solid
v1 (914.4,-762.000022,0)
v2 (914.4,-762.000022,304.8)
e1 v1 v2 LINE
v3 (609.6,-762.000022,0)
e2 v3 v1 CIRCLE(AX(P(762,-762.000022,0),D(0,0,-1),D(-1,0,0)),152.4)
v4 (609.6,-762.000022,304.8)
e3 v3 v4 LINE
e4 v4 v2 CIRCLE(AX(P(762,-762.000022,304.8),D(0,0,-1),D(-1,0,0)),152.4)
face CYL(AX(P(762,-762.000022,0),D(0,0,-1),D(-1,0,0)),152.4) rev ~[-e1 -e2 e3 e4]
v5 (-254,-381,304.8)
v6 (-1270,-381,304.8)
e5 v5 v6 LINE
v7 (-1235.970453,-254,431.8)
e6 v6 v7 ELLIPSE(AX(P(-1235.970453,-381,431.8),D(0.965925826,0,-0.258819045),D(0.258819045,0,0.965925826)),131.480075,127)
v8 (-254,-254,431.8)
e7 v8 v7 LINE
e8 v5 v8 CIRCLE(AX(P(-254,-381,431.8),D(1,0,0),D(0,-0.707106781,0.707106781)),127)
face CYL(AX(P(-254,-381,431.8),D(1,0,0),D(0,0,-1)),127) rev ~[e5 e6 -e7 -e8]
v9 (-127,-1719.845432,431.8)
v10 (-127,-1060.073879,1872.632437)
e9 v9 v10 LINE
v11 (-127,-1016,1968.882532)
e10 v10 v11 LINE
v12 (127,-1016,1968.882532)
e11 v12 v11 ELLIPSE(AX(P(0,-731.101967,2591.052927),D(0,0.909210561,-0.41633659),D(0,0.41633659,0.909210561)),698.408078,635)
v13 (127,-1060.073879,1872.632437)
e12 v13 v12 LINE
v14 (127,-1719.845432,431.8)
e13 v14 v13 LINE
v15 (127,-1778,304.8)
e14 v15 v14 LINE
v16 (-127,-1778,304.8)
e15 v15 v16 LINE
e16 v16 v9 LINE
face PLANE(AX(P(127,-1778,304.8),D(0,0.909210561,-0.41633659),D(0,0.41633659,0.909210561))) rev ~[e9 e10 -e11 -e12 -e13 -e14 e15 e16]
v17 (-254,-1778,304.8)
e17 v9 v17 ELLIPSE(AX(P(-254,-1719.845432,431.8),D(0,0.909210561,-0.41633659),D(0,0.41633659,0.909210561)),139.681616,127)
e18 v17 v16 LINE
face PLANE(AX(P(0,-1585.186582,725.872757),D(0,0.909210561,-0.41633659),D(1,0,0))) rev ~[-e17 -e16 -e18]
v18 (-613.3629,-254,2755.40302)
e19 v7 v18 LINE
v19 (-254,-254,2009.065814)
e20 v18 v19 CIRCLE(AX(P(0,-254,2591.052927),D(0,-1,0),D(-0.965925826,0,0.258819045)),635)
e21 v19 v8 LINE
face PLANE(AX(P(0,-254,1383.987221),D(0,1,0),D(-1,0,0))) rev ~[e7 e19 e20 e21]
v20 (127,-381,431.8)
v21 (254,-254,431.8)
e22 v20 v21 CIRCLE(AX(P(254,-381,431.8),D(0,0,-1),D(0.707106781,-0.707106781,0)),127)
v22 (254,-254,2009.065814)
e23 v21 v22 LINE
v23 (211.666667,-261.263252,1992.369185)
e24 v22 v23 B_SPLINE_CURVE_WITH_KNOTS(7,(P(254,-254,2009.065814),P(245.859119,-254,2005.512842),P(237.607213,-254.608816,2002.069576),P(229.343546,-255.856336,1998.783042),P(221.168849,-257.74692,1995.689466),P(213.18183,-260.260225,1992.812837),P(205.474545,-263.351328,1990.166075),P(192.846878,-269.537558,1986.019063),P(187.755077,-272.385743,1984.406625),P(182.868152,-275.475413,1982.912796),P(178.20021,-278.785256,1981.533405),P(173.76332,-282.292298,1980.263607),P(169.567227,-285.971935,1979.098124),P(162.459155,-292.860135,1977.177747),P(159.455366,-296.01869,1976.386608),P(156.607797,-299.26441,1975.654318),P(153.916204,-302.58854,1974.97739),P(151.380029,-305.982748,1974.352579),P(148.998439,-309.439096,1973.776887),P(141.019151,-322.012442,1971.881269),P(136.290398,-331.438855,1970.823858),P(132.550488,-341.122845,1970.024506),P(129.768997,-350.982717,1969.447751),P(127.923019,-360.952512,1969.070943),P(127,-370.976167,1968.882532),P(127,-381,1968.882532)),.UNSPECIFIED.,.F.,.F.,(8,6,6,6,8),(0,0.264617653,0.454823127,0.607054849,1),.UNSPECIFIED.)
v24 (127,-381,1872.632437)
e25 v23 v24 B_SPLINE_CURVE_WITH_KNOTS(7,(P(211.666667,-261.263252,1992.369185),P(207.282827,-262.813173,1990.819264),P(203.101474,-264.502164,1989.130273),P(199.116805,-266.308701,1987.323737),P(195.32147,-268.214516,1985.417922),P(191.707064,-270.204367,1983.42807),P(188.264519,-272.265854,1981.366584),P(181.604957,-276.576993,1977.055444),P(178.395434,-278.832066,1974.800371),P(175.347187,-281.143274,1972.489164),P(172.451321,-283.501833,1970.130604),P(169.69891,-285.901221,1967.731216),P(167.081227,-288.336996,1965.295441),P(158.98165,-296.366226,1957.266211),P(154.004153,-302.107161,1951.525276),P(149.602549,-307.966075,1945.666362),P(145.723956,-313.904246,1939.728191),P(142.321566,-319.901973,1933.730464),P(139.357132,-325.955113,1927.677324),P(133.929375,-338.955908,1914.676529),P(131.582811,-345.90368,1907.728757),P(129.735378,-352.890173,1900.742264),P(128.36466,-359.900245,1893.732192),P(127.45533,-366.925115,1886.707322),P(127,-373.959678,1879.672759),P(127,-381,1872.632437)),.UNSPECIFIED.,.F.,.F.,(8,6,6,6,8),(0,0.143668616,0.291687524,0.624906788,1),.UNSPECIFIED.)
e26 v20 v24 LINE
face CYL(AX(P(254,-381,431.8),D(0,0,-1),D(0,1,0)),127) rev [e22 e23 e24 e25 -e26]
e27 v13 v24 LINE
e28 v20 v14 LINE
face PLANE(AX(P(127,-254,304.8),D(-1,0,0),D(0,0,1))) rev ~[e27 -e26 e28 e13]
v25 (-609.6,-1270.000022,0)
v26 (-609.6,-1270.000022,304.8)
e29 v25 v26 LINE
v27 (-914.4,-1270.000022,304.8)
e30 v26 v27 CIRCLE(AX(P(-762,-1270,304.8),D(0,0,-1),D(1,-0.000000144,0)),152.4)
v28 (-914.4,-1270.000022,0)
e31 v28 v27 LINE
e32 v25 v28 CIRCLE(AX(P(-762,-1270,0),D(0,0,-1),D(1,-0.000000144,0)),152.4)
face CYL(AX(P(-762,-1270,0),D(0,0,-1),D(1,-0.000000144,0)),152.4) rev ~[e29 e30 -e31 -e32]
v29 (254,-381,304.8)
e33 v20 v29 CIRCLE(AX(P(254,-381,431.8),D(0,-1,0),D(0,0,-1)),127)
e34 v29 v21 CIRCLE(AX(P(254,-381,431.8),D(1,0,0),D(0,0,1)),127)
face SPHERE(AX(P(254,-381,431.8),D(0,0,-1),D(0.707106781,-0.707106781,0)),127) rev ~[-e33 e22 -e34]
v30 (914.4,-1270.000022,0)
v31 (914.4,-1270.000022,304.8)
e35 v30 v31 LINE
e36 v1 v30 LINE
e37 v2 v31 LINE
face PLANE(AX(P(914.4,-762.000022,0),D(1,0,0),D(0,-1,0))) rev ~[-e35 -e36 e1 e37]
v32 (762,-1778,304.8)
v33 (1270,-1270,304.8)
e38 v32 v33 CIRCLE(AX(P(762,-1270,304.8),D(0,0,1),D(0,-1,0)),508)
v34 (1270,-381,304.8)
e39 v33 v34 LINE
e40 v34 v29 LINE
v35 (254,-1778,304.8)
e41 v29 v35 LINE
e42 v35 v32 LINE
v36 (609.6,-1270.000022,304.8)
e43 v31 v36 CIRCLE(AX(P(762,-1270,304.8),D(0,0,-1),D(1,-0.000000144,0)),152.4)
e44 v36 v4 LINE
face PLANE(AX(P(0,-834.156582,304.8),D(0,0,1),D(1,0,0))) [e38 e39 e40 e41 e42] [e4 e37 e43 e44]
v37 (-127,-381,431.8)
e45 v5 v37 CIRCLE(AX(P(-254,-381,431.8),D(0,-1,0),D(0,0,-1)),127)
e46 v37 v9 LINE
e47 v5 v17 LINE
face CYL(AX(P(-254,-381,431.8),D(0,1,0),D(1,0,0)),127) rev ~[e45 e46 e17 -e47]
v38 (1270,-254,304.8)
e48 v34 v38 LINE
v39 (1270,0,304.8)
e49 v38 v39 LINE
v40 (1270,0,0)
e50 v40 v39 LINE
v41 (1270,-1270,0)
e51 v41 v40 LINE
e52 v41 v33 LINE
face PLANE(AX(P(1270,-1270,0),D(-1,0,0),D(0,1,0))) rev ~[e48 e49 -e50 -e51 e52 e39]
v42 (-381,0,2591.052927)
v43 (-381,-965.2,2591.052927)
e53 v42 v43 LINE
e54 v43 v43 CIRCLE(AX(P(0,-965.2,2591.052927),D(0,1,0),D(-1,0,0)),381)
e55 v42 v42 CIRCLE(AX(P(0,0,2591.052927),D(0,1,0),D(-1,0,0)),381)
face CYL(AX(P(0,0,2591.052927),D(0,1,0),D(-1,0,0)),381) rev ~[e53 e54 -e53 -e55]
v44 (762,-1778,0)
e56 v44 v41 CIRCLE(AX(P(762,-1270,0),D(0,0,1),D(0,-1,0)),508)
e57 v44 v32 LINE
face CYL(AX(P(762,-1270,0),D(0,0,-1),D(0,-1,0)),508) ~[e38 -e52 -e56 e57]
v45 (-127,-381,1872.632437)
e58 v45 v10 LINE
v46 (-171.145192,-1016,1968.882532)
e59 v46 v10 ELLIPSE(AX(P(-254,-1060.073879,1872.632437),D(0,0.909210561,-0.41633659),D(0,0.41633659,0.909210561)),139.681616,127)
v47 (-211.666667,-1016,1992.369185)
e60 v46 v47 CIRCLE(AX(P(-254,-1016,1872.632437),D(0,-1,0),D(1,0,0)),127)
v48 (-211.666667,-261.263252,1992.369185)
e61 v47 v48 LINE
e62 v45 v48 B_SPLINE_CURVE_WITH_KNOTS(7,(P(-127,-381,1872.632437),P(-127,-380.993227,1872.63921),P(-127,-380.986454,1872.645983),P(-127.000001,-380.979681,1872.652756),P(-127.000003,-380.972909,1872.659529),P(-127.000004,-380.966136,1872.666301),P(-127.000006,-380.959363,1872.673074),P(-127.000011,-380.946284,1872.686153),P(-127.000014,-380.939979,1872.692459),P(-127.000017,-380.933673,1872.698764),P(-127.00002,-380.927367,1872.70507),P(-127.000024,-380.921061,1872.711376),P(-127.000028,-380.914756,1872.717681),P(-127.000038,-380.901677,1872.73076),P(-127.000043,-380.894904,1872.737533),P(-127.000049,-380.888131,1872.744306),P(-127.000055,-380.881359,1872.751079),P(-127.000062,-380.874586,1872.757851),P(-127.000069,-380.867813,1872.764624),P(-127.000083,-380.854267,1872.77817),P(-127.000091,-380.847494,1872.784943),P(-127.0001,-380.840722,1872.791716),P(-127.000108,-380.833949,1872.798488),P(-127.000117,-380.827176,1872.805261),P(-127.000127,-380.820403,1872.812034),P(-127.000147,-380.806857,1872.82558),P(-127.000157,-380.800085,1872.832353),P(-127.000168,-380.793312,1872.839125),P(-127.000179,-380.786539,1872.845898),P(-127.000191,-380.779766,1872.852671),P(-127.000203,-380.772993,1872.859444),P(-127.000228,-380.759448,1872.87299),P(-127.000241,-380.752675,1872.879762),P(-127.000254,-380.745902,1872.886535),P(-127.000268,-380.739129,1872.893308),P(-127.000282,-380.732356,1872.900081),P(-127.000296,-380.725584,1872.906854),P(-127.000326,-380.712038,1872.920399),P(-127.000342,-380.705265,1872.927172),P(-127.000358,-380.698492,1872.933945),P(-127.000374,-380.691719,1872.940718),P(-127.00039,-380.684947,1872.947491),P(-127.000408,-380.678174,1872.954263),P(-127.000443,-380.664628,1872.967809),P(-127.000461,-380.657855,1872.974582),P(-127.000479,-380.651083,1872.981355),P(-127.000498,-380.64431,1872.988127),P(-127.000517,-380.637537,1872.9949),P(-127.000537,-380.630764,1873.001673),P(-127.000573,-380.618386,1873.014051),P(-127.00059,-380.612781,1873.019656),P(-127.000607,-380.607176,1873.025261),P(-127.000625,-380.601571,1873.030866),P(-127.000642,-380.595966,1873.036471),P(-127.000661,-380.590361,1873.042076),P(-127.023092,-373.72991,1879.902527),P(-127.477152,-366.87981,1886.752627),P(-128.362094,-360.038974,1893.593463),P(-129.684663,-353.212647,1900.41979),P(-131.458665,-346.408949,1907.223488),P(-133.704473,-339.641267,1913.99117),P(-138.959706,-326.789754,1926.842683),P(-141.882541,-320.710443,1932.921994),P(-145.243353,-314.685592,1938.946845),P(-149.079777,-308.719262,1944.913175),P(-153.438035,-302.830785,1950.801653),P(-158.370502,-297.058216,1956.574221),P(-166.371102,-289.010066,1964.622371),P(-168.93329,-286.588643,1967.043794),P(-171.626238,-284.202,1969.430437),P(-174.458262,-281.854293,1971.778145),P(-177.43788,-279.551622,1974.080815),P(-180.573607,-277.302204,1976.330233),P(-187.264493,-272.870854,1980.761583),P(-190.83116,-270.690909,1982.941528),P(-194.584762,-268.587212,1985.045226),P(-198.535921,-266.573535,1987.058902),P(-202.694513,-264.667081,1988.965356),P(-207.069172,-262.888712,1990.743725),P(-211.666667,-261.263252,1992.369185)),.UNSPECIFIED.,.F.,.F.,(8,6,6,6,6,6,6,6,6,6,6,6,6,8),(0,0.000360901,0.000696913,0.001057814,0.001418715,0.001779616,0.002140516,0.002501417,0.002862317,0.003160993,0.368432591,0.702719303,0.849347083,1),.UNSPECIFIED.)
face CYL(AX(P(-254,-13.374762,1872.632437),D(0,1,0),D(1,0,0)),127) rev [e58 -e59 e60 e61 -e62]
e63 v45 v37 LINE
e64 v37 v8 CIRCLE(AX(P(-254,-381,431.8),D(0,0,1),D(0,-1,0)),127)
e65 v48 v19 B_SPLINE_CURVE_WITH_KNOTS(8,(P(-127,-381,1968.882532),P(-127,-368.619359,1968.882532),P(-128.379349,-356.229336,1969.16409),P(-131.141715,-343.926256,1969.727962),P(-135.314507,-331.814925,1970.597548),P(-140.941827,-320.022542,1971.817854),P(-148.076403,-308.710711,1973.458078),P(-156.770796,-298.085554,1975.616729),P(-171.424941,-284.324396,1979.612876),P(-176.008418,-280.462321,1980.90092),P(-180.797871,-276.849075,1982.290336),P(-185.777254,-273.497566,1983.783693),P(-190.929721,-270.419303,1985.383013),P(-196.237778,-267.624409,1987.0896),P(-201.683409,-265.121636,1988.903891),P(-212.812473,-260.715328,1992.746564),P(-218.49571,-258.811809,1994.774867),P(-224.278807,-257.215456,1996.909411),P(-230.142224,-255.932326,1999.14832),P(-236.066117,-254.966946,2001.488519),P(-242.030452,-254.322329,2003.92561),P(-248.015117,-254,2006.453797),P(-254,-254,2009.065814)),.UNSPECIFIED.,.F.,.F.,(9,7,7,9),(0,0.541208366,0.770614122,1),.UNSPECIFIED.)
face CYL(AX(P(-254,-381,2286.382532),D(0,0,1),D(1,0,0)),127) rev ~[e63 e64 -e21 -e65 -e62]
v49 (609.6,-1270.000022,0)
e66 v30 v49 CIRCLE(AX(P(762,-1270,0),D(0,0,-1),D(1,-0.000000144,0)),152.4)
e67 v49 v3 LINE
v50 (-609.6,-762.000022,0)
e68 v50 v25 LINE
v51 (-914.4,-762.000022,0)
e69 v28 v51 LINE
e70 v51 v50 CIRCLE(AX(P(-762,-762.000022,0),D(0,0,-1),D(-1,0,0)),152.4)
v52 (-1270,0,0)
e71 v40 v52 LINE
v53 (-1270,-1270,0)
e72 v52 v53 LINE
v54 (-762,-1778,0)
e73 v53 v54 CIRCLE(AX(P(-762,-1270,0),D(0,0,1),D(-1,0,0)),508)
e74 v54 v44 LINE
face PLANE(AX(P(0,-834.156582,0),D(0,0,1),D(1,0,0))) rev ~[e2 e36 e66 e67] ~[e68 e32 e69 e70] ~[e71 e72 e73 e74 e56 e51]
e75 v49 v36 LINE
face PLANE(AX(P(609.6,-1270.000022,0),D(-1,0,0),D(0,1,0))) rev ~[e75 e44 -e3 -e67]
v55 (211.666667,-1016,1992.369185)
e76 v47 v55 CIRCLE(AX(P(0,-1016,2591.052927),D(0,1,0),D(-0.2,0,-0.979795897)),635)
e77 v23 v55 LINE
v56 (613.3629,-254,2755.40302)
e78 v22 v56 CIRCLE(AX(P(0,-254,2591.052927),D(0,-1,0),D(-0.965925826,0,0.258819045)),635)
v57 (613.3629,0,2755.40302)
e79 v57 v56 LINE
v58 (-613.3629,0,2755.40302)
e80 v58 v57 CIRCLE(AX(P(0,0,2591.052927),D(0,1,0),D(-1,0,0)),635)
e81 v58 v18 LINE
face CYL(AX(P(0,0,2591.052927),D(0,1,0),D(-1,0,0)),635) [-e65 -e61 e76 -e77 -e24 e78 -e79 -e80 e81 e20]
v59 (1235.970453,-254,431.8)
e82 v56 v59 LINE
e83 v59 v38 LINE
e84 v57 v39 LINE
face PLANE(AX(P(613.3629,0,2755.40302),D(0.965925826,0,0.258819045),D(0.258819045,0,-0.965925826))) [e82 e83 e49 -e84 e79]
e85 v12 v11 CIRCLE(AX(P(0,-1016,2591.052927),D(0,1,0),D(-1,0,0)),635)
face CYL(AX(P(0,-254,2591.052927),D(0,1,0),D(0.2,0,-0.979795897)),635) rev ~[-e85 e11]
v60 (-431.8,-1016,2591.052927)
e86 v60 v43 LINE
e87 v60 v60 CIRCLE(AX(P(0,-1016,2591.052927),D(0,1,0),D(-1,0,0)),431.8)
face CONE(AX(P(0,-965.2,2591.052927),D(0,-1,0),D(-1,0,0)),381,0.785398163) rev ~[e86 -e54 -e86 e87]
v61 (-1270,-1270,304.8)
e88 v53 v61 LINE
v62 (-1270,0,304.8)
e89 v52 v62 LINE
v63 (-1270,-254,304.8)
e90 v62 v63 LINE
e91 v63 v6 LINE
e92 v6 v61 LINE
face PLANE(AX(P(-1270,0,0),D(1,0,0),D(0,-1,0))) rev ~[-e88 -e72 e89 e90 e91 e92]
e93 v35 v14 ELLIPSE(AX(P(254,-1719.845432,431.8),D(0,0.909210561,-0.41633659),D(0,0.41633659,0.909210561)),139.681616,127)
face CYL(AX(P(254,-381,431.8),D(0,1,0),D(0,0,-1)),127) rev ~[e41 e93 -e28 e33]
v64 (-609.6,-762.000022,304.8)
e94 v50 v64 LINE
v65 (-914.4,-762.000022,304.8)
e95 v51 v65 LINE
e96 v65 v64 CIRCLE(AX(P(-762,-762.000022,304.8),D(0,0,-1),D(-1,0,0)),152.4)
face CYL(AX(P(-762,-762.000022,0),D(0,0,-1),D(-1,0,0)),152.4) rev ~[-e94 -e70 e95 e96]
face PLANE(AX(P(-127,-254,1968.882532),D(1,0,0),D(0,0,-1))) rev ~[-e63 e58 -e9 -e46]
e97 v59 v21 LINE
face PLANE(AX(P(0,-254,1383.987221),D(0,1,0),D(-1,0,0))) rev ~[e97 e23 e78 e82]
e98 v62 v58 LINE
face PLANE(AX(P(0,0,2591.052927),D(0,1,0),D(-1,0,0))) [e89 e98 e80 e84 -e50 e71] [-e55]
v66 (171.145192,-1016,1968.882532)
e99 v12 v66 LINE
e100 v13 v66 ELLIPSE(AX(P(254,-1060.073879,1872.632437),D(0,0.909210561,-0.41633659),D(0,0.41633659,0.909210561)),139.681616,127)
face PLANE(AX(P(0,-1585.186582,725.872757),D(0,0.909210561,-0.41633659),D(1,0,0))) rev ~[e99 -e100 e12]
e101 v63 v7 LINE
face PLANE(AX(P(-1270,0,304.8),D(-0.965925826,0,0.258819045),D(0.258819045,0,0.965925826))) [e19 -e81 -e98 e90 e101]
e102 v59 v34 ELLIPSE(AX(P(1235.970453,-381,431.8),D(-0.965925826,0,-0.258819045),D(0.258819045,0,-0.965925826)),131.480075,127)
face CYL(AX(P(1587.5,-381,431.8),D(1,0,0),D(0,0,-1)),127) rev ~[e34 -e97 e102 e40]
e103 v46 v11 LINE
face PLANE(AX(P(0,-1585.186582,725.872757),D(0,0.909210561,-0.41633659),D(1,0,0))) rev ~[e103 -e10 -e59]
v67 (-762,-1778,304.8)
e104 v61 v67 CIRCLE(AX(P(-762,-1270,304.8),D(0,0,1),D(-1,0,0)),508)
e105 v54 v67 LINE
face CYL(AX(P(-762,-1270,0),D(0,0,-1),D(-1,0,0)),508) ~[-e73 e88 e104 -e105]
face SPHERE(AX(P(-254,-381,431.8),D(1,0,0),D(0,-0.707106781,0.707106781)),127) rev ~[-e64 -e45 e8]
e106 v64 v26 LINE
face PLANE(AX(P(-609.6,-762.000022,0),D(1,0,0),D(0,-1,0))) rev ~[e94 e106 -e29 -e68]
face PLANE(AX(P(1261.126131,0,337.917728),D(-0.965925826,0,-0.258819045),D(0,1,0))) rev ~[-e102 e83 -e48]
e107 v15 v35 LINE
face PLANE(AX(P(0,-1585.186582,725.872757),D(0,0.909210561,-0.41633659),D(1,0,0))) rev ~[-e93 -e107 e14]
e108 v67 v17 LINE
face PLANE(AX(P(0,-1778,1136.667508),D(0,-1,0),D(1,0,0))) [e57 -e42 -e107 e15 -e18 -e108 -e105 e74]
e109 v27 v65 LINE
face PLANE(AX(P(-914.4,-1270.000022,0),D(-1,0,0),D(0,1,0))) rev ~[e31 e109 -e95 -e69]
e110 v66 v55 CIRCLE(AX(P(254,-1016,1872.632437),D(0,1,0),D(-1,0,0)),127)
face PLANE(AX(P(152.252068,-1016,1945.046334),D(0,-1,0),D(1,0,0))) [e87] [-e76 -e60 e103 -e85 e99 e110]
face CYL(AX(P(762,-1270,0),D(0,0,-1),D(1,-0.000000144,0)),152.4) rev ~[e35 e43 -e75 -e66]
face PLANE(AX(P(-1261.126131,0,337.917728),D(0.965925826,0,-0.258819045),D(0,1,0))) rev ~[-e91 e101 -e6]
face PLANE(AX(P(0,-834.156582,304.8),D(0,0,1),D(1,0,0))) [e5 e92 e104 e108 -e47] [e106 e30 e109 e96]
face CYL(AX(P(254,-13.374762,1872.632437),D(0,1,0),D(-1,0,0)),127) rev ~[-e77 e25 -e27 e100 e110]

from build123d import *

# Parameters (mm, degrees)
F1_DEPTH      = 304.8
F3_DEPTH      = 254
F2_R          = 381
F4_DEPTH      = 1016
F5_SIZE       = 50.8
F7_DEPTH      = 1524
F9_DEPTH      = 279.4
F10_T1_DEPTH  = 1002.6252375466
F10_S5_W      = 129.54
F10_S5_H      = 129.54
F10_T6_DEPTH  = 129.54
F10_S11_W     = 129.54
F10_S11_H     = 129.54
F10_T12_DEPTH = 129.54
F10_T18_DEPTH = 1333.5
F10_T23_DEPTH = 1714.5
F10_T28_DEPTH = 1854.5825321713
F10_S29_R     = 635
F10_T30_DEPTH = 933
F10_T34_DEPTH = 1854.5825321713
F10_S35_R     = 635
F10_T36_DEPTH = 933
F10_T40_DEPTH = 1333.5
F10_T45_DEPTH = 1714.5
F10_T50_DEPTH = 1243.2504750931
F10_T55_DEPTH = 1243.2504750931


# Not quite as in the source:
# - a fillet or chamfer that OpenCascade refuses, or shapes differently, is made with other operations: its cross-section is extruded or revolved along the edge and cut away or added


with BuildPart() as f1:
    # F0 (on Top) → F1 (new body)
    with BuildSketch(Plane.XY):
        with BuildLine():
            Line((0, 0), (-1270, 0))
            Line((-1270, 0), (-1270, -1270))
            ThreePointArc((-1270, -1270), (-1121.2102448428, -1629.2102448428), (-762, -1778))
            Line((-762, -1778), (762, -1778))
            ThreePointArc((762, -1778), (1121.2102448428, -1629.2102448428), (1270, -1270))
            Line((1270, -1270), (1270, 0))
            Line((1270, 0), (0, 0))
        make_face()
        with BuildLine():
            ThreePointArc((-609.6, -1270.0000219048), (-762, -1422.4), (-914.4, -1270.0000219048))
            Line((-914.4, -1270.0000219048), (-914.4, -762.0000219048))
            ThreePointArc((-914.4, -762.0000219048), (-762, -609.6000219048), (-609.6, -762.0000219048))
            Line((-609.6, -762.0000219048), (-609.6, -1270.0000219048))
        make_face(mode=Mode.SUBTRACT)
        with BuildLine():
            ThreePointArc((609.6, -762.0000219048), (762, -609.6000219048), (914.4, -762.0000219048))
            Line((914.4, -762.0000219048), (914.4, -1270.0000219048))
            ThreePointArc((914.4, -1270.0000219048), (762, -1422.4), (609.6, -1270.0000219048))
            Line((609.6, -1270.0000219048), (609.6, -762.0000219048))
        make_face(mode=Mode.SUBTRACT)
    extrude(amount=F1_DEPTH)

    # F2 (on face) → F3 (join)
    with BuildSketch(Plane(origin=(0, 0, 0), x_dir=(-1, 0, 0), z_dir=(0, 1, 0))):
        with BuildLine():
            Line((-613.3628996936, 2755.4030204783), (-1270, 304.8))
            Line((-1270, 304.8), (1270, 304.8))
            Line((1270, 304.8), (613.3628996936, 2755.4030204783))
            ThreePointArc((613.3628996936, 2755.4030204783), (629.5674869724, 2673.937058898), (635, 2591.0529268382))
            ThreePointArc((635, 2591.0529268382), (-82.8841320597, 1961.4854398659), (-613.3628996936, 2755.4030204783))
        make_face()
    extrude(amount=-F3_DEPTH)

    # F2 (on face) → F4 (join)
    with BuildSketch(Plane(origin=(0, 0, 0), x_dir=(-1, 0, 0), z_dir=(0, 1, 0))):
        with BuildLine():
            ThreePointArc((613.3628996936, 2755.4030204783), (0, 3226.0529268382), (-613.3628996936, 2755.4030204783))
            ThreePointArc((-613.3628996936, 2755.4030204783), (-82.8841320597, 1961.4854398659), (635, 2591.0529268382))
            ThreePointArc((635, 2591.0529268382), (629.5674869724, 2673.937058898), (613.3628996936, 2755.4030204783))
        make_face()
        with Locations((0, 2591.0529268382)):
            Circle(F2_R, mode=Mode.SUBTRACT)
    extrude(amount=-F4_DEPTH)

    # F5
    f5_edges = [f1.edges().sort_by_distance(p)[0] for p in [
        (381, -1016, 2591.052927),
    ]]
    chamfer(f5_edges, length=F5_SIZE)

    # F6 (on face) → F7 (join)
    with BuildSketch(Plane.XZ.offset(254)):
        with BuildLine():
            Line((-127, 1968.8825321713), (-127, 304.8))
            Line((-127, 304.8), (127, 304.8))
            Line((127, 304.8), (127, 1968.8825321713))
            ThreePointArc((127, 1968.8825321713), (0, 1956.0529268382), (-127, 1968.8825321713))
        make_face()
    extrude(amount=F7_DEPTH)

    # F8 (on face) → F9 (cut)
    with BuildSketch(Plane.YZ.offset(127)):
        Polygon((-1778, 1968.8825321713), (-1778, 304.8), (-1016, 1968.8825321713), align=None)
    extrude(amount=-F9_DEPTH, mode=Mode.SUBTRACT)

    # F10: fillet of radius 127 on 8 edges, made by hand

    # F10_s2 → F10_t1 (join)
    with BuildSketch(Plane.XZ.offset(13.3747624534)):
        with BuildLine():
            ThreePointArc((127, 1872.6324371527), (150.3049342222, 1945.9559213398), (211.6666666667, 1992.3691854336))
            ThreePointArc((211.6666666667, 1992.3691854336), (169.7400468309, 1979.1597037169), (127, 1968.8825321713))
            Line((127, 1968.8825321713), (127, 1872.6324371527))
        make_face()
        with BuildLine():
            ThreePointArc((-127, 1872.6324371527), (-150.3049342222, 1945.9559213398), (-211.6666666667, 1992.3691854336))
            ThreePointArc((-211.6666666667, 1992.3691854336), (-169.7400468309, 1979.1597037169), (-127, 1968.8825321713))
            Line((-127, 1968.8825321713), (-127, 1872.6324371527))
        make_face()
    extrude(amount=F10_T1_DEPTH)


with BuildPart() as f10_tool4:
    # F10_s5 → F10_t6 (new body)
    with BuildSketch(Plane.YZ.offset(-254)):
        with Locations((-316.23, 367.03)):
            Rectangle(F10_S5_W, F10_S5_H)
    extrude(amount=F10_T6_DEPTH)

    # F10_s7 → F10_t8 (revolve, cut)
    with BuildSketch(Plane(origin=(-254, -381, 431.8), x_dir=(0, -0.7071067812, 0.7071067812), z_dir=(0, 0.7071067812, 0.7071067812))):
        with BuildLine():
            ThreePointArc((0, -127), (127, 0), (0, 127))
            Line((0, 127), (0, -127))
        make_face()
    revolve(axis=Axis((-254, -381, 431.8), (1, 0, 0)), mode=Mode.SUBTRACT)


with BuildPart() as f1_1:
    add(f1.part)

    # F10_t3: union F10_tool4
    add(f10_tool4.part)


with BuildPart() as f10_tool10:
    # F10_s11 → F10_t12 (new body)
    with BuildSketch(Plane.XY.offset(431.8)):
        with Locations((189.23, -316.23)):
            Rectangle(F10_S11_W, F10_S11_H)
    extrude(amount=-F10_T12_DEPTH)

    # F10_s13 → F10_t14 (revolve, cut)
    with BuildSketch(Plane(origin=(254, -381, 431.8), x_dir=(0.7071067812, -0.7071067812, 0), z_dir=(0.7071067812, 0.7071067812, 0))):
        with BuildLine():
            ThreePointArc((0, -127), (127, 0), (0, 127))
            Line((0, 127), (0, -127))
        make_face()
    revolve(axis=Axis((254, -381, 431.8), (0, 0, -1)), mode=Mode.SUBTRACT)


with BuildPart() as f1_2:
    add(f1_1.part)

    # F10_t9: union F10_tool10
    add(f10_tool10.part)


with BuildPart() as f10_tool16:
    # F10_s17 → F10_t18 (new body)
    with BuildSketch(Plane.YZ.offset(-254)):
        with BuildLine():
            ThreePointArc((-381, 304.8), (-291.1974387893, 341.9974387893), (-254, 431.8))
            Line((-254, 431.8), (-254, 304.8))
            Line((-254, 304.8), (-381, 304.8))
        make_face()
    extrude(amount=-F10_T18_DEPTH)

    split(bisect_by=Plane(origin=(-1261.1261314031, 0, 337.9177284633), x_dir=(0, 1, 0), z_dir=(0.9659258263, 0, -0.2588190451)), keep=Keep.TOP)


with BuildPart() as f1_3:
    add(f1_2.part)

    # F10_t15: union F10_tool16
    add(f10_tool16.part)


with BuildPart() as f10_tool21:
    # F10_s22 → F10_t23 (new body)
    with BuildSketch(Plane.XZ.offset(381)):
        with BuildLine():
            ThreePointArc((-127, 431.8), (-164.1974387893, 341.9974387893), (-254, 304.8))
            Line((-254, 304.8), (-127, 304.8))
            Line((-127, 304.8), (-127, 431.8))
        make_face()
    extrude(amount=F10_T23_DEPTH)

    split(bisect_by=Plane(origin=(0, -1585.1865820182, 725.8727569971), x_dir=(1, 0, 0), z_dir=(0, 0.9092105607, -0.4163365902)), keep=Keep.TOP)


with BuildPart() as f1_4:
    add(f1_3.part)

    # F10_t20: union F10_tool21
    add(f10_tool21.part)


with BuildPart() as f10_tool26:
    # F10_s27 → F10_t28 (new body)
    with BuildSketch(Plane.XY.offset(2286.3825321713)):
        with BuildLine():
            ThreePointArc((-127, -381), (-164.1974387893, -291.1974387893), (-254, -254))
            Line((-254, -254), (-127, -254))
            Line((-127, -254), (-127, -381))
        make_face()
    extrude(amount=-F10_T28_DEPTH)

    # F10_s29 → F10_t30 (cut, symmetric)
    with BuildSketch(Plane.XZ.offset(317.5)):
        with Locations((0, 2591.0529268382)):
            Circle(F10_S29_R)
    extrude(amount=F10_T30_DEPTH, both=True, mode=Mode.SUBTRACT)


with BuildPart() as f1_5:
    add(f1_4.part)

    # F10_t25: union F10_tool26
    add(f10_tool26.part)


with BuildPart() as f10_tool32:
    # F10_s33 → F10_t34 (new body)
    with BuildSketch(Plane.XY.offset(431.8)):
        with BuildLine():
            ThreePointArc((254, -254), (164.1974387893, -291.1974387893), (127, -381))
            Line((127, -381), (127, -254))
            Line((127, -254), (254, -254))
        make_face()
    extrude(amount=F10_T34_DEPTH)

    # F10_s35 → F10_t36 (cut, symmetric)
    with BuildSketch(Plane.XZ.offset(317.5)):
        with Locations((0, 2591.0529268382)):
            Circle(F10_S35_R)
    extrude(amount=F10_T36_DEPTH, both=True, mode=Mode.SUBTRACT)


with BuildPart() as f1_6:
    add(f1_5.part)

    # F10_t31: union F10_tool32
    add(f10_tool32.part)


with BuildPart() as f10_tool38:
    # F10_s39 → F10_t40 (new body)
    with BuildSketch(Plane.YZ.offset(1587.5)):
        with BuildLine():
            ThreePointArc((-381, 304.8), (-291.1974387893, 341.9974387893), (-254, 431.8))
            Line((-254, 431.8), (-254, 304.8))
            Line((-254, 304.8), (-381, 304.8))
        make_face()
    extrude(amount=-F10_T40_DEPTH)

    split(bisect_by=Plane(origin=(1261.1261314031, 0, 337.9177284633), x_dir=(0, 1, 0), z_dir=(-0.9659258263, 0, -0.2588190451)), keep=Keep.TOP)


with BuildPart() as f1_7:
    add(f1_6.part)

    # F10_t37: union F10_tool38
    add(f10_tool38.part)


with BuildPart() as f10_tool43:
    # F10_s44 → F10_t45 (new body)
    with BuildSketch(Plane.XZ.offset(381)):
        with BuildLine():
            ThreePointArc((254, 304.8), (164.1974387893, 341.9974387893), (127, 431.8))
            Line((127, 431.8), (127, 304.8))
            Line((127, 304.8), (254, 304.8))
        make_face()
    extrude(amount=F10_T45_DEPTH)

    split(bisect_by=Plane(origin=(0, -1585.1865820182, 725.8727569971), x_dir=(1, 0, 0), z_dir=(0, 0.9092105607, -0.4163365902)), keep=Keep.TOP)


with BuildPart() as f1_8:
    add(f1_7.part)

    # F10_t42: union F10_tool43
    add(f10_tool43.part)


with BuildPart() as f10_tool48:
    # F10_s49 → F10_t50 (new body)
    with BuildSketch(Plane.XZ.offset(13.3747624534)):
        with BuildLine():
            ThreePointArc((127, 1872.6324371527), (150.3049342222, 1945.9559213398), (211.6666666667, 1992.3691854336))
            ThreePointArc((211.6666666667, 1992.3691854336), (169.7400468309, 1979.1597037169), (127, 1968.8825321713))
            Line((127, 1968.8825321713), (127, 1872.6324371527))
        make_face()
    extrude(amount=F10_T50_DEPTH)

    split(bisect_by=Plane(origin=(0, -1585.1865820182, 725.8727569971), x_dir=(1, 0, 0), z_dir=(0, 0.9092105607, -0.4163365902)), keep=Keep.TOP)


with BuildPart() as f1_9:
    add(f1_8.part)

    # F10_t47: union F10_tool48
    add(f10_tool48.part)


with BuildPart() as f10_tool53:
    # F10_s54 → F10_t55 (new body)
    with BuildSketch(Plane.XZ.offset(13.3747624535)):
        with BuildLine():
            ThreePointArc((-127, 1872.6324371527), (-150.3049342222, 1945.9559213398), (-211.6666666667, 1992.3691854336))
            ThreePointArc((-211.6666666667, 1992.3691854336), (-169.7400468309, 1979.1597037169), (-127, 1968.8825321713))
            Line((-127, 1968.8825321713), (-127, 1872.6324371527))
        make_face()
    extrude(amount=F10_T55_DEPTH)

    split(bisect_by=Plane(origin=(0, -1585.1865820182, 725.8727569971), x_dir=(1, 0, 0), z_dir=(0, 0.9092105607, -0.4163365902)), keep=Keep.TOP)


with BuildPart() as f1_10:
    add(f1_9.part)

    # F10_t52: union F10_tool53
    add(f10_tool53.part)


solid = f1_10.part
